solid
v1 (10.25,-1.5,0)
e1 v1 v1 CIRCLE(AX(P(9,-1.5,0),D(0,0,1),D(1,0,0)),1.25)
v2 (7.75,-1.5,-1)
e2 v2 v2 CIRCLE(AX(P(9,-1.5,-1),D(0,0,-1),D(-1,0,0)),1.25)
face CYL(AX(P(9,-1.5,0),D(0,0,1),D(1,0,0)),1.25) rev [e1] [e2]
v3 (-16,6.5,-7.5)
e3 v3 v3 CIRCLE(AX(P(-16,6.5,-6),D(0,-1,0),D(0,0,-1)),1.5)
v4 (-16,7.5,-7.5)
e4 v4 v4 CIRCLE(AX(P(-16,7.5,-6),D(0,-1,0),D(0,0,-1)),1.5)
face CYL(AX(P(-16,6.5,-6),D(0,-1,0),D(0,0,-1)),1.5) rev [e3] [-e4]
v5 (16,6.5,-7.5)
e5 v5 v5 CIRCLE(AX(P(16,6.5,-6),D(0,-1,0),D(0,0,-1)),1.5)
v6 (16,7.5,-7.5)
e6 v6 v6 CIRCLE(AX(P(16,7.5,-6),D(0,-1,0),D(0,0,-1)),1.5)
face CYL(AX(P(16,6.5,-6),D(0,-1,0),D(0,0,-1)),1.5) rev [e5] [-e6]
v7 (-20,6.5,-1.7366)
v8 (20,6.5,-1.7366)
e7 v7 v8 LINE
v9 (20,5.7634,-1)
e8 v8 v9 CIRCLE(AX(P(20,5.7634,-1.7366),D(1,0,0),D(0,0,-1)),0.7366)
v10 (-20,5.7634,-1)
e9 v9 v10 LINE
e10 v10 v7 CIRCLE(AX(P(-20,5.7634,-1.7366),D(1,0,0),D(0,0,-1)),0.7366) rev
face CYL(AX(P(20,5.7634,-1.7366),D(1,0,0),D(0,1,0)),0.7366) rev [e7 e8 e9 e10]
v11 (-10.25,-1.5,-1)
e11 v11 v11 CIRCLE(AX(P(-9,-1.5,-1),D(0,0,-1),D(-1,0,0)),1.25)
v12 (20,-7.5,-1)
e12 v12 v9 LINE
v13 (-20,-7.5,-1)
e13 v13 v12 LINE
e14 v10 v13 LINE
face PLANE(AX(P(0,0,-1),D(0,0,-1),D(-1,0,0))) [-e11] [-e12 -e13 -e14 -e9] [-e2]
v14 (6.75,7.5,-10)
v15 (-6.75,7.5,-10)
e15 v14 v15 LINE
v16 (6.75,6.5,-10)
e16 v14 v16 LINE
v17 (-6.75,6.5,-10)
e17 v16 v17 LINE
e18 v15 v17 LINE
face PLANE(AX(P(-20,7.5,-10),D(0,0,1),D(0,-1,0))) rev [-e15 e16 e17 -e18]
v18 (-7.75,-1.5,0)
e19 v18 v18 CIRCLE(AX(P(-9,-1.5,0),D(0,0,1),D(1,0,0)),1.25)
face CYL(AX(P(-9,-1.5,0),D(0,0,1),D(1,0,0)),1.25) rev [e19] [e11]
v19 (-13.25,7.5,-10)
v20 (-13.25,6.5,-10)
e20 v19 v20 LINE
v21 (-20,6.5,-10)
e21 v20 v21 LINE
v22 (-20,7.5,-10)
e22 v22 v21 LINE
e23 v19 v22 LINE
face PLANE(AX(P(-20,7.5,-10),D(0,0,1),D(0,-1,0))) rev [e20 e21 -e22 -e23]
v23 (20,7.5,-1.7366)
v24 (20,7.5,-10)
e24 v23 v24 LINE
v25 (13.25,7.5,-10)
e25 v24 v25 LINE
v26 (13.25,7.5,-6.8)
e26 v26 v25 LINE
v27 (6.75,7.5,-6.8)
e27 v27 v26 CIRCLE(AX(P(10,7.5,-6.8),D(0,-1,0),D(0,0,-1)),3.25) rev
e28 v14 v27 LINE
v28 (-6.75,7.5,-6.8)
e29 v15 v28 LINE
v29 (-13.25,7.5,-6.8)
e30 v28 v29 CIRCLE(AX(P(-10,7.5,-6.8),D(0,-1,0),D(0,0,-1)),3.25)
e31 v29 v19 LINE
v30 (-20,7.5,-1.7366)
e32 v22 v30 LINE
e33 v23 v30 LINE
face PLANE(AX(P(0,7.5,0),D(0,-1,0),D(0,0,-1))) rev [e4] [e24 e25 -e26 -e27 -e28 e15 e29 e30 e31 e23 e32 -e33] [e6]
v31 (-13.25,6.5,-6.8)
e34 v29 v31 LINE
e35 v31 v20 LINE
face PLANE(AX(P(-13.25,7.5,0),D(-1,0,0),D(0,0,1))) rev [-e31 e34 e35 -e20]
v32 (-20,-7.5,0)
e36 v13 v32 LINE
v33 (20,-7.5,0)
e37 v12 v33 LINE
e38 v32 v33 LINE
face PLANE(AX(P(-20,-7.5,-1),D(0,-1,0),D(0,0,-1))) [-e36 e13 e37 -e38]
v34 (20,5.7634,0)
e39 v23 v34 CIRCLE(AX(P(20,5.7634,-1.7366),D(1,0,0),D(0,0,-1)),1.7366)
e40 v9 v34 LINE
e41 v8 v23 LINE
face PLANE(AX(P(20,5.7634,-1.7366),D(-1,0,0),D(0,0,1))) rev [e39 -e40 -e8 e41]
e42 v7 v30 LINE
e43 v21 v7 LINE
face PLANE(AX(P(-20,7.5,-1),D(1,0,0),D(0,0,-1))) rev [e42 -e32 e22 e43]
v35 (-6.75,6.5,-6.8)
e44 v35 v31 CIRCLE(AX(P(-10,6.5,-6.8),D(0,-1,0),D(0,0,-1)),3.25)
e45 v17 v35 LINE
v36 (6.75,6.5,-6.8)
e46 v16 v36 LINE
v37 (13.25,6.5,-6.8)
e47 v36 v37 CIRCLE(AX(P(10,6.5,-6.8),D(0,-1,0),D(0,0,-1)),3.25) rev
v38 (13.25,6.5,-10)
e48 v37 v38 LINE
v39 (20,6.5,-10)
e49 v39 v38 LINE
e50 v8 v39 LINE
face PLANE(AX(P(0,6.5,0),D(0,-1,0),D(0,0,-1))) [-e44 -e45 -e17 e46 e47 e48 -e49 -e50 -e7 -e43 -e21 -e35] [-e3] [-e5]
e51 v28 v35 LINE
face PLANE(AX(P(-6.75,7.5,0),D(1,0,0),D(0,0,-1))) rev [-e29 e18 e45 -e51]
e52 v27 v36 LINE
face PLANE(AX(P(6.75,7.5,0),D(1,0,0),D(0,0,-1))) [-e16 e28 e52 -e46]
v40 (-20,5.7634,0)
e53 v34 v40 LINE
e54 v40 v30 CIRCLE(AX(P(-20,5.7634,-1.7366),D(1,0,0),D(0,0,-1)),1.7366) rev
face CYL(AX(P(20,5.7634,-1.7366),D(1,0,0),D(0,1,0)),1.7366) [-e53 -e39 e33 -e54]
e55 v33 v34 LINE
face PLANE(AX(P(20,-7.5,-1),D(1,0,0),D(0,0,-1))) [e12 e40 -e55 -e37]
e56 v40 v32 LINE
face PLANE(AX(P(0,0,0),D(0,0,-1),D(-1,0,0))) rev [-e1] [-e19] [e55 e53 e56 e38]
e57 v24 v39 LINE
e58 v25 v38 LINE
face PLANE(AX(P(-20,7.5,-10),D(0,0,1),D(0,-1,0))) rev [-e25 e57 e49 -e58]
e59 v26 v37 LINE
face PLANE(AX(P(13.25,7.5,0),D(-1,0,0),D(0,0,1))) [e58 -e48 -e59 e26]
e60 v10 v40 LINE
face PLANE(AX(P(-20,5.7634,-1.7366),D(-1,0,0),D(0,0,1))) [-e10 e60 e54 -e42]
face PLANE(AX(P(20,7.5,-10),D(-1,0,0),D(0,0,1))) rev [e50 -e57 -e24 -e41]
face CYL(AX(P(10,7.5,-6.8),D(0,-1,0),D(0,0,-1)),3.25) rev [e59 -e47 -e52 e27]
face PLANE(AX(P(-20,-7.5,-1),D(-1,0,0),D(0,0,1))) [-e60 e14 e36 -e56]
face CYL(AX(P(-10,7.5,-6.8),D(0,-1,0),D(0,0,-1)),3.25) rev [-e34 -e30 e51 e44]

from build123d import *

# Parameters (mm, degrees)
SZKIC1_W                           = 40
SZKIC1_H                           = 15
ODGI_CIE_BAZOWE1_DEPTH             = 1
ODGI_CIE_KRAW_DZI1_STRIP_W         = 5.4732
ODGI_CIE_KRAW_DZI1_STRIP_H         = 1
ODGI_CIE_KRAW_DZI1_STRIP_CUT_DEPTH = 40
ODGI_CIE_KRAW_DZI1_DEPTH           = 40
OTW_R_GWINTOWANY_M3X0_51_D         = 2.5
WYTNIJ_WYCI_GNI_CIE1_DEPTH         = 27.381811917
OTWORY_USTALAJ_CE_3_0MM1_D         = 3


# Sheet-metal steps are written as plain solids
with BuildPart() as part:
    # Szkic1 → Odgięcie bazowe1 (new body)
    with BuildSketch(Plane.XY):
        Rectangle(SZKIC1_W, SZKIC1_H)
    extrude(amount=-ODGI_CIE_BAZOWE1_DEPTH)

    # Odgięcie krawędzi1 strip (across the edge) → Odgięcie krawędzi1 strip cut (cut)
    with BuildSketch(Plane(origin=(-20, 7.5, -1), x_dir=(0, -1, 0), z_dir=(1, 0, 0))):
        with Locations((-1, -0.5)):
            Rectangle(ODGI_CIE_KRAW_DZI1_STRIP_W, ODGI_CIE_KRAW_DZI1_STRIP_H)
    extrude(amount=ODGI_CIE_KRAW_DZI1_STRIP_CUT_DEPTH, mode=Mode.SUBTRACT)

    # Odgięcie krawędzi1 section (across the edge) → Odgięcie krawędzi1 (add)
    with BuildSketch(Plane(origin=(-20, 7.5, -1), x_dir=(0, -1, 0), z_dir=(1, 0, 0))):
        with BuildLine():
            Line((0, 0.7366), (0, 9))
            Line((0, 9), (1, 9))
            Line((1, 9), (1, 0.7366))
            ThreePointArc((1, 0.7366), (1.215745145, 0.215745145), (1.7366, 0))
            Line((1.7366, 0), (1.7366, -1))
            ThreePointArc((1.7366, -1), (0.508638364, -0.491361636), (0, 0.7366))
        make_face()
    extrude(amount=ODGI_CIE_KRAW_DZI1_DEPTH)

    # Otwór gwintowany M3x0.51 (through all)
    with Locations(Plane.XY):
        with Locations((-9, -1.5), (9, -1.5)):
            Hole(OTW_R_GWINTOWANY_M3X0_51_D / 2)

    # Szkic11 → Wytnij-wyciągnięcie1 (cut, through all)
    with BuildSketch(Plane.XZ.offset(-6.5)):
        with BuildLine():
            ThreePointArc((-10.567890835, -10), (-12.490797584, -8.887684697), (-13.25, -6.8))
            Line((-13.25, -6.8), (-13.25, -10))
            Line((-13.25, -10), (-10.567890835, -10))
        make_face()
        with BuildLine():
            Line((-6.75, -10), (-6.75, -6.8))
            ThreePointArc((-6.75, -6.8), (-7.509202416, -8.887684697), (-9.432109165, -10))
            Line((-9.432109165, -10), (-6.75, -10))
        make_face()
        with BuildLine():
            ThreePointArc((-6.75, -6.8), (-10, -3.55), (-13.25, -6.8))
            ThreePointArc((-13.25, -6.8), (-12.490797584, -8.887684697), (-10.567890835, -10))
            Line((-10.567890835, -10), (-9.432109165, -10))
            ThreePointArc((-9.432109165, -10), (-7.509202416, -8.887684697), (-6.75, -6.8))
        make_face()
        with BuildLine():
            Line((-9.432109165, -10), (-10.567890835, -10))
            ThreePointArc((-10.567890835, -10), (-10, -10.05), (-9.432109165, -10))
        make_face()
        with BuildLine():
            ThreePointArc((13.25, -6.8), (10, -3.55), (6.75, -6.8))
            ThreePointArc((6.75, -6.8), (7.509202416, -8.887684697), (9.432109165, -10))
            Line((9.432109165, -10), (10.567890835, -10))
            ThreePointArc((10.567890835, -10), (12.490797584, -8.887684697), (13.25, -6.8))
        make_face()
        with BuildLine():
            Line((10.567890835, -10), (9.432109165, -10))
            ThreePointArc((9.432109165, -10), (10, -10.05), (10.567890835, -10))
        make_face()
        with BuildLine():
            Line((6.75, -6.8), (6.75, -10))
            Line((6.75, -10), (9.432109165, -10))
            ThreePointArc((9.432109165, -10), (7.509202416, -8.887684697), (6.75, -6.8))
        make_face()
        with BuildLine():
            Line((13.25, -10), (13.25, -6.8))
            ThreePointArc((13.25, -6.8), (12.490797584, -8.887684697), (10.567890835, -10))
            Line((10.567890835, -10), (13.25, -10))
        make_face()
    extrude(amount=-WYTNIJ_WYCI_GNI_CIE1_DEPTH, mode=Mode.SUBTRACT)

    # Otwory ustalające Ø3.0mm1 (through all)
    with Locations(Plane(origin=(0, 6.5, 0), x_dir=(-1, 0, 0), z_dir=(0, -1, 0))):
        with Locations((16, 6), (-16, 6)):
            Hole(OTWORY_USTALAJ_CE_3_0MM1_D / 2)


solid = part.part
